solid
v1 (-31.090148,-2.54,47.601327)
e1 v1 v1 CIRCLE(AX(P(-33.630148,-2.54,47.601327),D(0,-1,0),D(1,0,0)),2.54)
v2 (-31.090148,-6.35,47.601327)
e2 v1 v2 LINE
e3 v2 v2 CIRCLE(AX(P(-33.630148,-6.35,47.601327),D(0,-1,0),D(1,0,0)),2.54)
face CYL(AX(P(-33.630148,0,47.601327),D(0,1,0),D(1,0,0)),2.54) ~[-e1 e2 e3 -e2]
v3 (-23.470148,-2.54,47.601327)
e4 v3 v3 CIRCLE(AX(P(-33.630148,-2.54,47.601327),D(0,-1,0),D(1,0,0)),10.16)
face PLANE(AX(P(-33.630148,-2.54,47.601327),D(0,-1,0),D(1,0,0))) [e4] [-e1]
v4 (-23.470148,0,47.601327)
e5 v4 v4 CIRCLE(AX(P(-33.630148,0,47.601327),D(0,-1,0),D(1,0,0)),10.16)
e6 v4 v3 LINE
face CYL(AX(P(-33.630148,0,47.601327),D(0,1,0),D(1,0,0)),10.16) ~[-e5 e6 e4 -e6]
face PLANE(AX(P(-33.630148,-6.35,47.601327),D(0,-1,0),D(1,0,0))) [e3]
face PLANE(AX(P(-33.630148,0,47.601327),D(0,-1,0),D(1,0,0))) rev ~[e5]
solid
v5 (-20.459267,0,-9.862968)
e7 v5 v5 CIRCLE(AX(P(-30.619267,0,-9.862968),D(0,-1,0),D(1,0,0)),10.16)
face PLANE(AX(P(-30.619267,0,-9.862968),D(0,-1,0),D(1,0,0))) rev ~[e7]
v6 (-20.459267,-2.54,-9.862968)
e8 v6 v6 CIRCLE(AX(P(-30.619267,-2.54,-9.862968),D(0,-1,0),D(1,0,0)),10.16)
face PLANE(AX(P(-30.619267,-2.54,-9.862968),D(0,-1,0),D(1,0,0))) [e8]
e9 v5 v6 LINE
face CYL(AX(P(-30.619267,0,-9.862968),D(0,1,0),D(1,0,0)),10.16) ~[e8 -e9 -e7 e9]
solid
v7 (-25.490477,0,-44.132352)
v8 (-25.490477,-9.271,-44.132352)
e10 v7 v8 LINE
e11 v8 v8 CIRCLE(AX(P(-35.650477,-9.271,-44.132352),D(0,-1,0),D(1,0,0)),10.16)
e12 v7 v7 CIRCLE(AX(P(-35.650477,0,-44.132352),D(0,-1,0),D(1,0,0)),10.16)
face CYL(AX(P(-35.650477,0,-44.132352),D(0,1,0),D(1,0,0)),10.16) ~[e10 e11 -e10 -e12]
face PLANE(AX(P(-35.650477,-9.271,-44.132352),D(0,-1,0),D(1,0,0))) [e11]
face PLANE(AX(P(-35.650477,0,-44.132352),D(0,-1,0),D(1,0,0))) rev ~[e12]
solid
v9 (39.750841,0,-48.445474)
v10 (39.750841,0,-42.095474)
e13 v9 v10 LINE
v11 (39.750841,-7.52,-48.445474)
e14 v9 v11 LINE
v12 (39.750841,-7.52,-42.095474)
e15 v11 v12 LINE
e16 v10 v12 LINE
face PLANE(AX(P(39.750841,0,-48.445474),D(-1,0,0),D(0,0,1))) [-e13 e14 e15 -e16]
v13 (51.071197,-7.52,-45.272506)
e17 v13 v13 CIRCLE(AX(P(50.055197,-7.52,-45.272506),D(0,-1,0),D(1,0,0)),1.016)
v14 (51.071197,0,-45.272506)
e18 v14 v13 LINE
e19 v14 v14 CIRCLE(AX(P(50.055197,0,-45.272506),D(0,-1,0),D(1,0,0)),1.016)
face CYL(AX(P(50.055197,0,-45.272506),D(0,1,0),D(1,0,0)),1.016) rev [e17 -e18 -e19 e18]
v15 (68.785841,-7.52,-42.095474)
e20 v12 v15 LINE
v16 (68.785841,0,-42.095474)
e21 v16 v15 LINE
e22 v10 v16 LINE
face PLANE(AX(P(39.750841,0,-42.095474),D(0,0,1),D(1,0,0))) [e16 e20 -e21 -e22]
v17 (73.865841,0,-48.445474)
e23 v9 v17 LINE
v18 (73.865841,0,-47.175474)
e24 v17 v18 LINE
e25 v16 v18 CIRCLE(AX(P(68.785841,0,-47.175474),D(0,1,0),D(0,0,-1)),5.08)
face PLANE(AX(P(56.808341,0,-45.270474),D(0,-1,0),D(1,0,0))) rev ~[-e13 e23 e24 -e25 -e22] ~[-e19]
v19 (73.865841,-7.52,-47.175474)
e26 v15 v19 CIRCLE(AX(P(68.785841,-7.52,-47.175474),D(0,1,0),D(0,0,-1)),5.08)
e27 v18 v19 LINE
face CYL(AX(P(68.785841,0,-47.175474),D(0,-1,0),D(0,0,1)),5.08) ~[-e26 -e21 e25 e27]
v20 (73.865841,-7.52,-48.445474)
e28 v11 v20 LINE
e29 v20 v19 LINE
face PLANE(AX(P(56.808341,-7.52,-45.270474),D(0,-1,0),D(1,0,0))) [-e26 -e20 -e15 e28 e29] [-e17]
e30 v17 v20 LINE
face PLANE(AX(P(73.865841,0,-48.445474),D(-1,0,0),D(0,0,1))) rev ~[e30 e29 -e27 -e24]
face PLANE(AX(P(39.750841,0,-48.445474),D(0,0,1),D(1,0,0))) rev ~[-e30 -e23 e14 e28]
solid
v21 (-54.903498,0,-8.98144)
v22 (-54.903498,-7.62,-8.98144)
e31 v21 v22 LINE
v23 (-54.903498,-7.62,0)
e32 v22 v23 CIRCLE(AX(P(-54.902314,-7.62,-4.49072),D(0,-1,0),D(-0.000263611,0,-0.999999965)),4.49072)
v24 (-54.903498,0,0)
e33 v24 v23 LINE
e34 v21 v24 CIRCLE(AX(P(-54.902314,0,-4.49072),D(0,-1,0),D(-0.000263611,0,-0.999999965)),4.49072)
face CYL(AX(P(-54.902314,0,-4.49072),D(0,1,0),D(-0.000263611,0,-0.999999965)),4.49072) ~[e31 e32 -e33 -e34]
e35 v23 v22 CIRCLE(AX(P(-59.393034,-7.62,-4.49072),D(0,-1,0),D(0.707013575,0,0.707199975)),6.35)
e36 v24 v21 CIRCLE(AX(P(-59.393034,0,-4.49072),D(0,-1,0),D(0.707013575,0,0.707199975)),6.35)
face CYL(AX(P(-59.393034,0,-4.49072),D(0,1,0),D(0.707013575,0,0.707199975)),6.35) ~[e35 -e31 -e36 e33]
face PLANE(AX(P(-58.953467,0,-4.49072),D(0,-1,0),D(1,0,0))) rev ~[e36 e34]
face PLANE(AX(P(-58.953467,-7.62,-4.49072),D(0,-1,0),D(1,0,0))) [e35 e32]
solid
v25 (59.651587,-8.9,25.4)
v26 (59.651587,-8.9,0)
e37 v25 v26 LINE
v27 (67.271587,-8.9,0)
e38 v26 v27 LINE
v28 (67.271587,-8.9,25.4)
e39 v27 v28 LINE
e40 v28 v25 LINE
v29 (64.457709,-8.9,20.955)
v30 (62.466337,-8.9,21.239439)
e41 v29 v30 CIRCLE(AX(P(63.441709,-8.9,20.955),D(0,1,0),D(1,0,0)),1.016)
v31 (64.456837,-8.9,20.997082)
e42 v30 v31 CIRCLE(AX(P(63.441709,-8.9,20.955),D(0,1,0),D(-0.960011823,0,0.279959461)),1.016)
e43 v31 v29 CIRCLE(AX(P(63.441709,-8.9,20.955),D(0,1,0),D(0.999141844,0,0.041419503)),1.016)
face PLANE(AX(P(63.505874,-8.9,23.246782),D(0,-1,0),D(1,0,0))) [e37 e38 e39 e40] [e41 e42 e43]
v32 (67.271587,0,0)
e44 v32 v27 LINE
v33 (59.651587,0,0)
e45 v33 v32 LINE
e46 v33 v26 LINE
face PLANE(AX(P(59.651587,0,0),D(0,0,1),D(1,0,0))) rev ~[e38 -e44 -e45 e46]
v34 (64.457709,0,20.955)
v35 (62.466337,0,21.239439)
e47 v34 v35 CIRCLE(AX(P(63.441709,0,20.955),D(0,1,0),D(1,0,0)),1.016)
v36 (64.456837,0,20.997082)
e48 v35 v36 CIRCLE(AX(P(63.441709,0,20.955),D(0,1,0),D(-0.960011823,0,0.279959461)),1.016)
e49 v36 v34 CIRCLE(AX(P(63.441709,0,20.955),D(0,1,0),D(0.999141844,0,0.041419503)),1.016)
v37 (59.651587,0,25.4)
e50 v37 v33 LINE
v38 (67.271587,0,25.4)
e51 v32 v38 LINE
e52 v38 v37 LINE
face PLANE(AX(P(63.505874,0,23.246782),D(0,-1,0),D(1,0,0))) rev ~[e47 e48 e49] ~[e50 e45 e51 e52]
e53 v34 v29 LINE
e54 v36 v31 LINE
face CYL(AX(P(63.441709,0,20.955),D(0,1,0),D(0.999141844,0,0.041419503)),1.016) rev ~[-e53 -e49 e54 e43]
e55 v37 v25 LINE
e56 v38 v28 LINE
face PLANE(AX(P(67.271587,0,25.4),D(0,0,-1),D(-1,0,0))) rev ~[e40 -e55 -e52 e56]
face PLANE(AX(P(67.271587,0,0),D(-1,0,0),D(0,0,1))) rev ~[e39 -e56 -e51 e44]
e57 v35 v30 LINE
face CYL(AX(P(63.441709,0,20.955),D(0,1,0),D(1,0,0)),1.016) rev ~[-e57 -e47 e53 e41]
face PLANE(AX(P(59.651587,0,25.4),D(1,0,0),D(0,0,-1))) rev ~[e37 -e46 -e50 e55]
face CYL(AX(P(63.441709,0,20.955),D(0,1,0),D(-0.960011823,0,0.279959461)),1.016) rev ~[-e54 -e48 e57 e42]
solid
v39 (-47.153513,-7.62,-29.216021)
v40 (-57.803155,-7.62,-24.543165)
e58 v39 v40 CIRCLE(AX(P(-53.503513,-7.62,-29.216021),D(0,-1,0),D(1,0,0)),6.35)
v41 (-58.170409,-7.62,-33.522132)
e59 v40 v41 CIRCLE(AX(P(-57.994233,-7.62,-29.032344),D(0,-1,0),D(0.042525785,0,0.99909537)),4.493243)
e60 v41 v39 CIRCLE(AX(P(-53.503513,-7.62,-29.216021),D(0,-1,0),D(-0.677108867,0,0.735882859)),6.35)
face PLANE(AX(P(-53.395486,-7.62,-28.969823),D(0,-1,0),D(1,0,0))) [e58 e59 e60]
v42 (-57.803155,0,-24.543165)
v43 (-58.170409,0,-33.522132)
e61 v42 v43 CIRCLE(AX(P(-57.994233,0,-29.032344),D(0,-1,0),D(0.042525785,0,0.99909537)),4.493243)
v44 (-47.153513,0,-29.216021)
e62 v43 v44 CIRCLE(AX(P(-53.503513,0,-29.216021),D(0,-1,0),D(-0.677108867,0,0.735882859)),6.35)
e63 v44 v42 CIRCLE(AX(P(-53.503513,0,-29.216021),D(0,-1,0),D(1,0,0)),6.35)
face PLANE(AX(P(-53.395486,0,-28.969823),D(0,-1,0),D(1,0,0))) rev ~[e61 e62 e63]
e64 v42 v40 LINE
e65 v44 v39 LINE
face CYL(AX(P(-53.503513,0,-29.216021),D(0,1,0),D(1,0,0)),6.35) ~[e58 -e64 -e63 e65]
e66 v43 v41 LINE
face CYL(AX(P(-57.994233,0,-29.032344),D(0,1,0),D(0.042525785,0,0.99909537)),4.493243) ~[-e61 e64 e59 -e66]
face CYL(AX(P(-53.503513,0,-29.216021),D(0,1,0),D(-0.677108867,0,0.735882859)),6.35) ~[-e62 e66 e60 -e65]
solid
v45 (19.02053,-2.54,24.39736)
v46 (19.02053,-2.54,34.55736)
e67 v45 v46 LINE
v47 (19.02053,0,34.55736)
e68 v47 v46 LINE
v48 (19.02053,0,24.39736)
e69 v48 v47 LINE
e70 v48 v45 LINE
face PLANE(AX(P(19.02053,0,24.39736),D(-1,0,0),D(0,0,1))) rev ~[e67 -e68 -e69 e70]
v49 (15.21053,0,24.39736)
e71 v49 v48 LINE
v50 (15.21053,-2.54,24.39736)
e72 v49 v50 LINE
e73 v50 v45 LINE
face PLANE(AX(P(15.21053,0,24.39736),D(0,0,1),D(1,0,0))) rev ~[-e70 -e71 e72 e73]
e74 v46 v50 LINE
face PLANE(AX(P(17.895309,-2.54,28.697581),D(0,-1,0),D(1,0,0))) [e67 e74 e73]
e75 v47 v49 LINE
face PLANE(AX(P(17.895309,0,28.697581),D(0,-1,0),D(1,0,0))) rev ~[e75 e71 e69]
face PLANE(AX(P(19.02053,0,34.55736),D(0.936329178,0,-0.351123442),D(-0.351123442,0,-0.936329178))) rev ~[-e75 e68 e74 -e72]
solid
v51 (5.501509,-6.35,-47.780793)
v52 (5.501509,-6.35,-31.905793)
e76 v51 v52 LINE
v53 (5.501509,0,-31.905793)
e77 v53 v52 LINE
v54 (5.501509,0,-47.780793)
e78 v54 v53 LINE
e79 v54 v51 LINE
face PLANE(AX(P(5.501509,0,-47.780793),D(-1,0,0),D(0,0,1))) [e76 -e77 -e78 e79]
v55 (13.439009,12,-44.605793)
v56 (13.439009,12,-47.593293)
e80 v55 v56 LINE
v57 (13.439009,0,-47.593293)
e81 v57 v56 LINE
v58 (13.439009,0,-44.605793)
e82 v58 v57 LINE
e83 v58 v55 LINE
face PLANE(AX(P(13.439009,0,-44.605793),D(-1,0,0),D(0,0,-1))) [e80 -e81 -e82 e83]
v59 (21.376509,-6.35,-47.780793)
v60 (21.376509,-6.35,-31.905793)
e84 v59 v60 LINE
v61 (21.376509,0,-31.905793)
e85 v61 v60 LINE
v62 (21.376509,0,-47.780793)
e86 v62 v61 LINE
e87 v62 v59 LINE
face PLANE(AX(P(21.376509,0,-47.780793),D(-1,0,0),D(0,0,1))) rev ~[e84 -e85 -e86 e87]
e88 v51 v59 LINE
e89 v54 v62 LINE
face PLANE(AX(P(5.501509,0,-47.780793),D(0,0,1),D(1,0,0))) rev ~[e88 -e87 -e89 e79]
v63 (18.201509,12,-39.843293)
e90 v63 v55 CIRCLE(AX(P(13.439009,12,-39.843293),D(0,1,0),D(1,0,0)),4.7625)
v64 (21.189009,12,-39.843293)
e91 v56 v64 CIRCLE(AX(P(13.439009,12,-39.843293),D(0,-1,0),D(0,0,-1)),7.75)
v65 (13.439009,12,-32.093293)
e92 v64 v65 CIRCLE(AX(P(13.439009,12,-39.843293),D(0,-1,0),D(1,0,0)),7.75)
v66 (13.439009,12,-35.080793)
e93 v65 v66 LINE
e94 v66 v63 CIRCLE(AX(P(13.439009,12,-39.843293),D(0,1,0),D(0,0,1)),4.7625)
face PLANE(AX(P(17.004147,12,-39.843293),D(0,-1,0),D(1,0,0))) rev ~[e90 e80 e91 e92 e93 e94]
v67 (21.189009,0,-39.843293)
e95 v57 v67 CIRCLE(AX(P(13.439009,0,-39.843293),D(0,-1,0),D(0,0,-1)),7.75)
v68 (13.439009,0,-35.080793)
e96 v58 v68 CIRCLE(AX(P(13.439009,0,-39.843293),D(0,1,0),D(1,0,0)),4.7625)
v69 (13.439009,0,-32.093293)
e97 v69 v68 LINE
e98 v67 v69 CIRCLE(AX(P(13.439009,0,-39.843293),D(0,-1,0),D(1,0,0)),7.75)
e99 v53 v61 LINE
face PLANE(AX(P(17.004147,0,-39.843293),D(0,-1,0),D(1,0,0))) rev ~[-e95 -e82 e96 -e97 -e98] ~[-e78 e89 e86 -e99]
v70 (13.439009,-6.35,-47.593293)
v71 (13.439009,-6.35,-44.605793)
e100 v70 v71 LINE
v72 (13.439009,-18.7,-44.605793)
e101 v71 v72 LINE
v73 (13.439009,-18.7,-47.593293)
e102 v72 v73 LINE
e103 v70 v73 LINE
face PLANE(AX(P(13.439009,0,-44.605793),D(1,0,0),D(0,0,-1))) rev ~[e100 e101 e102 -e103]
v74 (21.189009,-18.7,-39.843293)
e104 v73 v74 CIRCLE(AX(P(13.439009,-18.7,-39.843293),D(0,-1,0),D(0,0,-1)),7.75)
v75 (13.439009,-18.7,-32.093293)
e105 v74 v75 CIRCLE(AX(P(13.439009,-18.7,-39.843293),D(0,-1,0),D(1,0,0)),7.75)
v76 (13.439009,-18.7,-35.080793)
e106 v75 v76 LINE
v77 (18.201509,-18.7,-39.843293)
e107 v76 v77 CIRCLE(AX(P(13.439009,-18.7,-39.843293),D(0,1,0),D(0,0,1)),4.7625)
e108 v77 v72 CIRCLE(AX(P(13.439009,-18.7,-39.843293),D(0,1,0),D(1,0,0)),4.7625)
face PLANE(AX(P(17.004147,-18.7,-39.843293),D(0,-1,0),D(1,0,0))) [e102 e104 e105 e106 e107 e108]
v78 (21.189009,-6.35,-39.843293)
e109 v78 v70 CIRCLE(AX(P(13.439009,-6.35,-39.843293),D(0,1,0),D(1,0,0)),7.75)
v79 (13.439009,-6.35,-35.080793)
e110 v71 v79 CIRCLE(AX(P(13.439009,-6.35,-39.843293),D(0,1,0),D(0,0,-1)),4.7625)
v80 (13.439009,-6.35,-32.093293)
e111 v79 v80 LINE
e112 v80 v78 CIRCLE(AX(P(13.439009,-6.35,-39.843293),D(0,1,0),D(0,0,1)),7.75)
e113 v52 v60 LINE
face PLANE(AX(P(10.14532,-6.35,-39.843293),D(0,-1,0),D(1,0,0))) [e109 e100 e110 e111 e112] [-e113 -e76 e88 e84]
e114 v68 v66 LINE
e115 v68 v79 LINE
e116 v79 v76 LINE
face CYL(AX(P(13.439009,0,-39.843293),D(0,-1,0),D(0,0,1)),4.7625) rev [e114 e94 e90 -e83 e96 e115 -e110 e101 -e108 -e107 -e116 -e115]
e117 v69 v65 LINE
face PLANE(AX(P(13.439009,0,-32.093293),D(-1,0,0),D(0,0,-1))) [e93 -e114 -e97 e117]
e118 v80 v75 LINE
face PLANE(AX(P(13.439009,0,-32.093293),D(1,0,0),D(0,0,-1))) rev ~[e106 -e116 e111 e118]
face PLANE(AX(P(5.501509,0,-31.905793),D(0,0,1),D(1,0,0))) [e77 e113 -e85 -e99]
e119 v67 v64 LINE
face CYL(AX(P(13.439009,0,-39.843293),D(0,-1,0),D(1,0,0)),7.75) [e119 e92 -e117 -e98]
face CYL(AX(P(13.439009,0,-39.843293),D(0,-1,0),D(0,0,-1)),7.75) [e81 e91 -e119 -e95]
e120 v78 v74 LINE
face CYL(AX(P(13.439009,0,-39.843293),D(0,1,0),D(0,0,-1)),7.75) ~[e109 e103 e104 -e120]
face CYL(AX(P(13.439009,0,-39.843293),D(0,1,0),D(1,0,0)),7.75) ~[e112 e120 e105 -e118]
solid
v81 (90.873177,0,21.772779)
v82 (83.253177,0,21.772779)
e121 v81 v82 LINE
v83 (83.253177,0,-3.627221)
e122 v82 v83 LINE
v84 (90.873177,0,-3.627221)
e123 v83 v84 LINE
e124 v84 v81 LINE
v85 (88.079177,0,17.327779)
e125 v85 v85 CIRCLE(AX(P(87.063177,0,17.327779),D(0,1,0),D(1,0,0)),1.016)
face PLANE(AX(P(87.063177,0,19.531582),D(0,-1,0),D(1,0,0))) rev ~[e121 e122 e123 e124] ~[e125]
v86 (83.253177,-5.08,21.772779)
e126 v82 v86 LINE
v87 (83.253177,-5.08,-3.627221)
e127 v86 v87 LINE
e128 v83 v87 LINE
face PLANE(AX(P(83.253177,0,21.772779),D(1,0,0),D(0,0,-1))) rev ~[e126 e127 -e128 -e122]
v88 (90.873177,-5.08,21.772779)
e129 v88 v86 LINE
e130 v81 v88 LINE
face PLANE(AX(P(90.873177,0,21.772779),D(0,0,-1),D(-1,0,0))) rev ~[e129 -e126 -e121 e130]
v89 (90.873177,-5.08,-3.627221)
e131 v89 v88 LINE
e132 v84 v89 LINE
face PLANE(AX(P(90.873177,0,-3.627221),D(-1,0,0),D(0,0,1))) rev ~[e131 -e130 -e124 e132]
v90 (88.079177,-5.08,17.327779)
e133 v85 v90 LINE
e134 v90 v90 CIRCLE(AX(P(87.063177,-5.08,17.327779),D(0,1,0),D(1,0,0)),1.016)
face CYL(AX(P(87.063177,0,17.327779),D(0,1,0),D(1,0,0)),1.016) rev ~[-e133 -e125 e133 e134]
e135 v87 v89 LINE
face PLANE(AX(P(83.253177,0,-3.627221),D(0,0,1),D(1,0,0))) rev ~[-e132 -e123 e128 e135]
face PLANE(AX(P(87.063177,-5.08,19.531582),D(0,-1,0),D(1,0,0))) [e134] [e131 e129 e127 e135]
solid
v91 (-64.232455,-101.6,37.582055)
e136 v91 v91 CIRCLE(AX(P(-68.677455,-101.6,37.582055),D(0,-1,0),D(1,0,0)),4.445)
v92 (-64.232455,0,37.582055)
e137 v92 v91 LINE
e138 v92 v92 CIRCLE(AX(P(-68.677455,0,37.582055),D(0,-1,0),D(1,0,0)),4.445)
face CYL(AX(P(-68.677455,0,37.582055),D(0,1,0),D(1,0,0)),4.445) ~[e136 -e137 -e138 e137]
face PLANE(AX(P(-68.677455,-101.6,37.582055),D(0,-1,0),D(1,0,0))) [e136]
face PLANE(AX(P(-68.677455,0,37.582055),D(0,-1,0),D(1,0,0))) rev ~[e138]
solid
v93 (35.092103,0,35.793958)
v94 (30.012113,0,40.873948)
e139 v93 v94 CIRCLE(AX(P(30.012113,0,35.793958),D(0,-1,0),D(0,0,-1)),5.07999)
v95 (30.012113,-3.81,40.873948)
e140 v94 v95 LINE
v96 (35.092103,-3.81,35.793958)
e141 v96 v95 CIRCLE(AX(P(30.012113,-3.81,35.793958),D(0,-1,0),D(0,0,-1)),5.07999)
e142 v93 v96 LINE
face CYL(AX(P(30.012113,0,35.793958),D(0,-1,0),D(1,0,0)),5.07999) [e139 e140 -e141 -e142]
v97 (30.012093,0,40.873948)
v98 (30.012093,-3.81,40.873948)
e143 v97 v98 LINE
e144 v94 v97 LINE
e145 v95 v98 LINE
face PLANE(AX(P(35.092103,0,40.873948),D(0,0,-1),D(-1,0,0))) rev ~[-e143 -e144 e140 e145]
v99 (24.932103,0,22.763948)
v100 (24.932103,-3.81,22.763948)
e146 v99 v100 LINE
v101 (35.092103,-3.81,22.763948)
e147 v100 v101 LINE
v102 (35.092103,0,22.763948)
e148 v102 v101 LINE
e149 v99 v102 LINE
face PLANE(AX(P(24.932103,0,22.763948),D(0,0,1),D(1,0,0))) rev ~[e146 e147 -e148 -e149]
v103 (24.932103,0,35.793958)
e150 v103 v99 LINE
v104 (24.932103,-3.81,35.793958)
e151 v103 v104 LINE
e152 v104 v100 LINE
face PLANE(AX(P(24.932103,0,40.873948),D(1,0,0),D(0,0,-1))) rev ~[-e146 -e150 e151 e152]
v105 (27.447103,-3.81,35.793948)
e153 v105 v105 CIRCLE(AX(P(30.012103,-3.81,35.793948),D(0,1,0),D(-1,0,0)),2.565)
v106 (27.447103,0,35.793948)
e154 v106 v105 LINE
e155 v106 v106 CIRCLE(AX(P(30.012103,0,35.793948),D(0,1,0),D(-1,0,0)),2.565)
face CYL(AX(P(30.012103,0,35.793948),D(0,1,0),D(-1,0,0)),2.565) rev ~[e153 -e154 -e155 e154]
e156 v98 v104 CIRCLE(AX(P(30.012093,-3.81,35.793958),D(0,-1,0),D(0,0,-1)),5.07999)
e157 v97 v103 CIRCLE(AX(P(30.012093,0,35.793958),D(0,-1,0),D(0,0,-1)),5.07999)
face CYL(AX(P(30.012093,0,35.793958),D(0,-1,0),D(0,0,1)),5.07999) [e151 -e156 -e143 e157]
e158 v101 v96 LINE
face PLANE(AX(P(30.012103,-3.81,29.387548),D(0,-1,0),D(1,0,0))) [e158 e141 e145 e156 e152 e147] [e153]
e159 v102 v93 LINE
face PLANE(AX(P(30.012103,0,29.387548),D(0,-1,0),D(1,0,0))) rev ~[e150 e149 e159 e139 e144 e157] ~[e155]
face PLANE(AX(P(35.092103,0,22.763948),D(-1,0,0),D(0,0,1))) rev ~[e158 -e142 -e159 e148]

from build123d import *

# Parameters (mm, degrees)
F0_W           = 15.875
F0_H           = 15.875
F1_DEPTH       = 6.35
F0_W_2         = 34.115
F0_H_2         = 6.35
F0_R           = 1.016
F2_DEPTH       = 7.52
F3_DEPTH       = 7.62
F0_R_2         = 10.16
F4_DEPTH       = 9.271
F5_R           = 5.08
F6_DEPTH       = 2.54
F0_R_3         = 2.54
F7_DEPTH       = 6.35
F8_DEPTH       = 2.54
F9_DEPTH       = 3.81
F10_DEPTH      = 2.54
F11_R          = 5.07999
F12_DEPTH      = 7.62
F13_DEPTH      = 5.08
F14_DEPTH      = 8.9
F0_R_4         = 4.445
F15_DEPTH      = 101.6
F16_DEPTH      = 6.35
F17_DEPTH      = 18.7
F17_DEPTH_BACK = 12


# Not quite as in the source:
# - a fillet or chamfer is up to 0.001 mm smaller than in the source, because OpenCascade refuses the exact size
# - a length typed as a fraction of an inch, garbled in the dataset ("3 / 203.2 mm" for 3/8 in), is restored


with BuildPart() as f1:
    # F0 (on Front) → F1 (new body)
    with BuildSketch(Plane.XZ):
        with Locations((13.4390089661, -39.8432931602)):
            Rectangle(F0_W, F0_H)
        with BuildLine():
            ThreePointArc((13.4390089661, -47.5932931602), (5.6890089661, -39.8432931602), (13.4390089661, -32.0932931602))
            ThreePointArc((13.4390089661, -32.0932931602), (18.9190865203, -34.363215606), (21.1890089661, -39.8432931602))
            ThreePointArc((21.1890089661, -39.8432931602), (18.9190865203, -45.3233707144), (13.4390089661, -47.5932931602))
        make_face(mode=Mode.SUBTRACT)
    extrude(amount=F1_DEPTH)

    # F0 (on Front) → F16 (join)
    with BuildSketch(Plane.XZ):
        with BuildLine():
            ThreePointArc((13.4390089661, -44.6057931602), (8.6765089661, -39.8432931602), (13.4390089661, -35.0807931602))
            Line((13.4390089661, -35.0807931602), (13.4390089661, -32.0932931602))
            ThreePointArc((13.4390089661, -32.0932931602), (5.6890089661, -39.8432931602), (13.4390089661, -47.5932931602))
            Line((13.4390089661, -47.5932931602), (13.4390089661, -44.6057931602))
        make_face()
    extrude(amount=F16_DEPTH)

    # F0 (on Front) → F17 (join, two sides)
    with BuildSketch(Plane.XZ) as f17_sk:
        with BuildLine():
            ThreePointArc((13.4390089661, -35.0807931602), (16.8066050115, -36.4756971148), (18.2015089661, -39.8432931602))
            ThreePointArc((18.2015089661, -39.8432931602), (16.8066050115, -43.2108892056), (13.4390089661, -44.6057931602))
            Line((13.4390089661, -44.6057931602), (13.4390089661, -47.5932931602))
            ThreePointArc((13.4390089661, -47.5932931602), (18.9190865203, -45.3233707144), (21.1890089661, -39.8432931602))
            ThreePointArc((21.1890089661, -39.8432931602), (18.9190865203, -34.363215606), (13.4390089661, -32.0932931602))
            Line((13.4390089661, -32.0932931602), (13.4390089661, -35.0807931602))
        make_face()
    extrude(amount=F17_DEPTH)
    extrude(f17_sk.sketch, amount=-F17_DEPTH_BACK)


with BuildPart() as f2:
    # F0 (on Front) → F2 (new body)
    with BuildSketch(Plane.XZ):
        with Locations((56.8083405149, -45.2704743564)):
            Rectangle(F0_W_2, F0_H_2)
        with Locations((50.0551967038, -45.2725063564)):
            Circle(F0_R, mode=Mode.SUBTRACT)
    extrude(amount=F2_DEPTH)

    # F5
    f5_edges = [f2.edges().sort_by_distance(p)[0] for p in [
        (73.865841, -3.76, -42.095474),
    ]]
    fillet(f5_edges, radius=F5_R)


with BuildPart() as f3:
    # F0 (on Front) → F3 (new body)
    with BuildSketch(Plane.XZ):
        with BuildLine():
            ThreePointArc((-58.1704086232, -33.5221318855), (-51.1918348413, -35.1302957719), (-47.1535133362, -29.2160212994))
            ThreePointArc((-47.1535133362, -29.2160212994), (-50.9520649509, -23.4011600682), (-57.8031546393, -24.5431651423))
            ThreePointArc((-57.8031546393, -24.5431651423), (-59.8482084076, -28.9565132058), (-58.1704086232, -33.5221318855))
        make_face()
        with BuildLine():
            ThreePointArc((-58.1704086232, -33.5221318855), (-59.8482084076, -28.9565132058), (-57.8031546393, -24.5431651423))
            ThreePointArc((-57.8031546393, -24.5431651423), (-62.483722892, -28.8487164825), (-58.1704086232, -33.5221318855))
        make_face()
    extrude(amount=F3_DEPTH)


with BuildPart() as f4:
    # F0 (on Front) → F4 (new body)
    with BuildSketch(Plane.XZ):
        with Locations((-35.6504768133, -44.1323518753)):
            Circle(F0_R_2)
    extrude(amount=F4_DEPTH)


with BuildPart() as f6:
    # F0 (on Front) → F6 (new body)
    with BuildSketch(Plane.XZ):
        with Locations((-30.6192673743, -9.8629677668)):
            Circle(F0_R_2)
    extrude(amount=F6_DEPTH)


with BuildPart() as f7:
    # F0 (on Front) → F7 (new body)
    with BuildSketch(Plane.XZ):
        with Locations((-33.6301475763, 47.6013273001)):
            Circle(F0_R_3)
    extrude(amount=F7_DEPTH)

    # F0 (on Front) → F8 (join)
    with BuildSketch(Plane.XZ):
        with Locations((-33.6301475763, 47.6013273001)):
            Circle(F0_R_2)
        with Locations((-33.6301475763, 47.6013273001)):
            Circle(F0_R_3, mode=Mode.SUBTRACT)
    extrude(amount=F8_DEPTH)


with BuildPart() as f9:
    # F0 (on Front) → F9 (new body)
    with BuildSketch(Plane.XZ):
        with BuildLine():
            Line((27.4471032315, 35.7939480323), (24.9321032315, 35.7939480323))
            Line((24.9321032315, 35.7939480323), (24.9321032315, 22.7639480323))
            Line((24.9321032315, 22.7639480323), (35.0921032315, 22.7639480323))
            Line((35.0921032315, 22.7639480323), (35.0921032315, 35.7939480323))
            Line((35.0921032315, 35.7939480323), (32.5771032315, 35.7939480323))
            ThreePointArc((32.5771032315, 35.7939480323), (30.0121032315, 33.2289480323), (27.4471032315, 35.7939480323))
        make_face()
        with BuildLine():
            Line((35.0921032315, 40.8739480323), (24.9321032315, 40.8739480323))
            Line((24.9321032315, 40.8739480323), (24.9321032315, 35.7939480323))
            Line((24.9321032315, 35.7939480323), (27.4471032315, 35.7939480323))
            ThreePointArc((27.4471032315, 35.7939480323), (30.0121032315, 38.3589480323), (32.5771032315, 35.7939480323))
            Line((32.5771032315, 35.7939480323), (35.0921032315, 35.7939480323))
            Line((35.0921032315, 35.7939480323), (35.0921032315, 40.8739480323))
        make_face()
    extrude(amount=F9_DEPTH)

    # F11 (radius 5.08 in the source; OpenCascade refuses exactly that, so slightly less here)
    f11_edges = [f9.edges().sort_by_distance(p)[0] for p in [
        (35.092103, -1.905, 40.873948),
        (24.932103, -1.905, 40.873948),
    ]]
    fillet(f11_edges, radius=F11_R)


with BuildPart() as f10:
    # F0 (on Front) → F10 (new body)
    with BuildSketch(Plane.XZ):
        Polygon((19.0205297893, 24.3973601609), (19.0205297893, 34.5573601609), (15.2105297893, 24.3973601609), align=None)
    extrude(amount=F10_DEPTH)


with BuildPart() as f12:
    # F0 (on Front) → F12 (new body)
    with BuildSketch(Plane.XZ):
        with BuildLine():
            ThreePointArc((-54.9034981155, -8.9814396879), (-53.5265594418, -6.9211462608), (-53.0430343145, -4.490719844))
            ThreePointArc((-53.0430343145, -4.490719844), (-53.5265594418, -2.0602934271), (-54.9034981155, 0))
            ThreePointArc((-54.9034981155, 0), (-65.7430343145, -4.490719844), (-54.9034981155, -8.9814396879))
        make_face()
        with BuildLine():
            ThreePointArc((-54.9034981155, 0), (-53.5265594418, -2.0602934271), (-53.0430343145, -4.490719844))
            ThreePointArc((-53.0430343145, -4.490719844), (-53.5265594418, -6.9211462608), (-54.9034981155, -8.9814396879))
            ThreePointArc((-54.9034981155, -8.9814396879), (-50.4115943145, -4.490719844), (-54.9034981155, 0))
        make_face()
    extrude(amount=F12_DEPTH)


with BuildPart() as f13:
    # F0 (on Front) → F13 (new body)
    with BuildSketch(Plane.XZ):
        with BuildLine():
            Line((90.8731772517, 21.7727785543), (83.2531772517, 21.7727785543))
            Line((83.2531772517, 21.7727785543), (83.2531772517, 17.3277785543))
            Line((83.2531772517, 17.3277785543), (86.0471772517, 17.3277785543))
            ThreePointArc((86.0471772517, 17.3277785543), (87.0631772517, 18.3437785543), (88.0791772517, 17.3277785543))
            Line((88.0791772517, 17.3277785543), (90.8731772517, 17.3277785543))
            Line((90.8731772517, 17.3277785543), (90.8731772517, 21.7727785543))
        make_face()
        with BuildLine():
            Line((86.0471772517, 17.3277785543), (83.2531772517, 17.3277785543))
            Line((83.2531772517, 17.3277785543), (83.2531772517, -3.6272214457))
            Line((83.2531772517, -3.6272214457), (90.8731772517, -3.6272214457))
            Line((90.8731772517, -3.6272214457), (90.8731772517, 17.3277785543))
            Line((90.8731772517, 17.3277785543), (88.0791772517, 17.3277785543))
            ThreePointArc((88.0791772517, 17.3277785543), (87.0631772517, 16.3117785543), (86.0471772517, 17.3277785543))
        make_face()
    extrude(amount=F13_DEPTH)


with BuildPart() as f14:
    # F0 (on Front) → F14 (new body)
    with BuildSketch(Plane.XZ):
        with BuildLine():
            Line((67.2715870141, 25.4), (59.6515870141, 25.4))
            Line((59.6515870141, 25.4), (59.6515870141, 21.2394388122))
            Line((59.6515870141, 21.2394388122), (62.4663369513, 21.2394388122))
            ThreePointArc((62.4663369513, 21.2394388122), (63.5645068324, 21.9635517753), (64.456837077, 20.9970822176))
            Line((64.456837077, 20.9970822176), (67.2715870141, 20.9970822176))
            Line((67.2715870141, 20.9970822176), (67.2715870141, 25.4))
        make_face()
        with BuildLine():
            Line((62.4663369513, 21.2394388122), (59.6515870141, 21.2394388122))
            Line((59.6515870141, 21.2394388122), (59.6515870141, 0))
            Line((59.6515870141, 0), (67.2715870141, 0))
            Line((67.2715870141, 0), (67.2715870141, 20.9970822176))
            Line((67.2715870141, 20.9970822176), (64.456837077, 20.9970822176))
            ThreePointArc((64.456837077, 20.9970822176), (64.4574909684, 20.9760456244), (64.4577089634, 20.955))
            ThreePointArc((64.4577089634, 20.955), (63.2980461018, 19.9492082809), (62.4663369513, 21.2394388122))
        make_face()
    extrude(amount=F14_DEPTH)


with BuildPart() as f15:
    # F0 (on Front) → F15 (new body)
    with BuildSketch(Plane.XZ):
        with Locations((-68.6774551868, 37.5820547342)):
            Circle(F0_R_4)
    extrude(amount=F15_DEPTH)


solid = Compound([f1.part, f2.part, f3.part, f4.part, f6.part, f7.part, f9.part, f10.part, f12.part, f13.part, f14.part, f15.part])
